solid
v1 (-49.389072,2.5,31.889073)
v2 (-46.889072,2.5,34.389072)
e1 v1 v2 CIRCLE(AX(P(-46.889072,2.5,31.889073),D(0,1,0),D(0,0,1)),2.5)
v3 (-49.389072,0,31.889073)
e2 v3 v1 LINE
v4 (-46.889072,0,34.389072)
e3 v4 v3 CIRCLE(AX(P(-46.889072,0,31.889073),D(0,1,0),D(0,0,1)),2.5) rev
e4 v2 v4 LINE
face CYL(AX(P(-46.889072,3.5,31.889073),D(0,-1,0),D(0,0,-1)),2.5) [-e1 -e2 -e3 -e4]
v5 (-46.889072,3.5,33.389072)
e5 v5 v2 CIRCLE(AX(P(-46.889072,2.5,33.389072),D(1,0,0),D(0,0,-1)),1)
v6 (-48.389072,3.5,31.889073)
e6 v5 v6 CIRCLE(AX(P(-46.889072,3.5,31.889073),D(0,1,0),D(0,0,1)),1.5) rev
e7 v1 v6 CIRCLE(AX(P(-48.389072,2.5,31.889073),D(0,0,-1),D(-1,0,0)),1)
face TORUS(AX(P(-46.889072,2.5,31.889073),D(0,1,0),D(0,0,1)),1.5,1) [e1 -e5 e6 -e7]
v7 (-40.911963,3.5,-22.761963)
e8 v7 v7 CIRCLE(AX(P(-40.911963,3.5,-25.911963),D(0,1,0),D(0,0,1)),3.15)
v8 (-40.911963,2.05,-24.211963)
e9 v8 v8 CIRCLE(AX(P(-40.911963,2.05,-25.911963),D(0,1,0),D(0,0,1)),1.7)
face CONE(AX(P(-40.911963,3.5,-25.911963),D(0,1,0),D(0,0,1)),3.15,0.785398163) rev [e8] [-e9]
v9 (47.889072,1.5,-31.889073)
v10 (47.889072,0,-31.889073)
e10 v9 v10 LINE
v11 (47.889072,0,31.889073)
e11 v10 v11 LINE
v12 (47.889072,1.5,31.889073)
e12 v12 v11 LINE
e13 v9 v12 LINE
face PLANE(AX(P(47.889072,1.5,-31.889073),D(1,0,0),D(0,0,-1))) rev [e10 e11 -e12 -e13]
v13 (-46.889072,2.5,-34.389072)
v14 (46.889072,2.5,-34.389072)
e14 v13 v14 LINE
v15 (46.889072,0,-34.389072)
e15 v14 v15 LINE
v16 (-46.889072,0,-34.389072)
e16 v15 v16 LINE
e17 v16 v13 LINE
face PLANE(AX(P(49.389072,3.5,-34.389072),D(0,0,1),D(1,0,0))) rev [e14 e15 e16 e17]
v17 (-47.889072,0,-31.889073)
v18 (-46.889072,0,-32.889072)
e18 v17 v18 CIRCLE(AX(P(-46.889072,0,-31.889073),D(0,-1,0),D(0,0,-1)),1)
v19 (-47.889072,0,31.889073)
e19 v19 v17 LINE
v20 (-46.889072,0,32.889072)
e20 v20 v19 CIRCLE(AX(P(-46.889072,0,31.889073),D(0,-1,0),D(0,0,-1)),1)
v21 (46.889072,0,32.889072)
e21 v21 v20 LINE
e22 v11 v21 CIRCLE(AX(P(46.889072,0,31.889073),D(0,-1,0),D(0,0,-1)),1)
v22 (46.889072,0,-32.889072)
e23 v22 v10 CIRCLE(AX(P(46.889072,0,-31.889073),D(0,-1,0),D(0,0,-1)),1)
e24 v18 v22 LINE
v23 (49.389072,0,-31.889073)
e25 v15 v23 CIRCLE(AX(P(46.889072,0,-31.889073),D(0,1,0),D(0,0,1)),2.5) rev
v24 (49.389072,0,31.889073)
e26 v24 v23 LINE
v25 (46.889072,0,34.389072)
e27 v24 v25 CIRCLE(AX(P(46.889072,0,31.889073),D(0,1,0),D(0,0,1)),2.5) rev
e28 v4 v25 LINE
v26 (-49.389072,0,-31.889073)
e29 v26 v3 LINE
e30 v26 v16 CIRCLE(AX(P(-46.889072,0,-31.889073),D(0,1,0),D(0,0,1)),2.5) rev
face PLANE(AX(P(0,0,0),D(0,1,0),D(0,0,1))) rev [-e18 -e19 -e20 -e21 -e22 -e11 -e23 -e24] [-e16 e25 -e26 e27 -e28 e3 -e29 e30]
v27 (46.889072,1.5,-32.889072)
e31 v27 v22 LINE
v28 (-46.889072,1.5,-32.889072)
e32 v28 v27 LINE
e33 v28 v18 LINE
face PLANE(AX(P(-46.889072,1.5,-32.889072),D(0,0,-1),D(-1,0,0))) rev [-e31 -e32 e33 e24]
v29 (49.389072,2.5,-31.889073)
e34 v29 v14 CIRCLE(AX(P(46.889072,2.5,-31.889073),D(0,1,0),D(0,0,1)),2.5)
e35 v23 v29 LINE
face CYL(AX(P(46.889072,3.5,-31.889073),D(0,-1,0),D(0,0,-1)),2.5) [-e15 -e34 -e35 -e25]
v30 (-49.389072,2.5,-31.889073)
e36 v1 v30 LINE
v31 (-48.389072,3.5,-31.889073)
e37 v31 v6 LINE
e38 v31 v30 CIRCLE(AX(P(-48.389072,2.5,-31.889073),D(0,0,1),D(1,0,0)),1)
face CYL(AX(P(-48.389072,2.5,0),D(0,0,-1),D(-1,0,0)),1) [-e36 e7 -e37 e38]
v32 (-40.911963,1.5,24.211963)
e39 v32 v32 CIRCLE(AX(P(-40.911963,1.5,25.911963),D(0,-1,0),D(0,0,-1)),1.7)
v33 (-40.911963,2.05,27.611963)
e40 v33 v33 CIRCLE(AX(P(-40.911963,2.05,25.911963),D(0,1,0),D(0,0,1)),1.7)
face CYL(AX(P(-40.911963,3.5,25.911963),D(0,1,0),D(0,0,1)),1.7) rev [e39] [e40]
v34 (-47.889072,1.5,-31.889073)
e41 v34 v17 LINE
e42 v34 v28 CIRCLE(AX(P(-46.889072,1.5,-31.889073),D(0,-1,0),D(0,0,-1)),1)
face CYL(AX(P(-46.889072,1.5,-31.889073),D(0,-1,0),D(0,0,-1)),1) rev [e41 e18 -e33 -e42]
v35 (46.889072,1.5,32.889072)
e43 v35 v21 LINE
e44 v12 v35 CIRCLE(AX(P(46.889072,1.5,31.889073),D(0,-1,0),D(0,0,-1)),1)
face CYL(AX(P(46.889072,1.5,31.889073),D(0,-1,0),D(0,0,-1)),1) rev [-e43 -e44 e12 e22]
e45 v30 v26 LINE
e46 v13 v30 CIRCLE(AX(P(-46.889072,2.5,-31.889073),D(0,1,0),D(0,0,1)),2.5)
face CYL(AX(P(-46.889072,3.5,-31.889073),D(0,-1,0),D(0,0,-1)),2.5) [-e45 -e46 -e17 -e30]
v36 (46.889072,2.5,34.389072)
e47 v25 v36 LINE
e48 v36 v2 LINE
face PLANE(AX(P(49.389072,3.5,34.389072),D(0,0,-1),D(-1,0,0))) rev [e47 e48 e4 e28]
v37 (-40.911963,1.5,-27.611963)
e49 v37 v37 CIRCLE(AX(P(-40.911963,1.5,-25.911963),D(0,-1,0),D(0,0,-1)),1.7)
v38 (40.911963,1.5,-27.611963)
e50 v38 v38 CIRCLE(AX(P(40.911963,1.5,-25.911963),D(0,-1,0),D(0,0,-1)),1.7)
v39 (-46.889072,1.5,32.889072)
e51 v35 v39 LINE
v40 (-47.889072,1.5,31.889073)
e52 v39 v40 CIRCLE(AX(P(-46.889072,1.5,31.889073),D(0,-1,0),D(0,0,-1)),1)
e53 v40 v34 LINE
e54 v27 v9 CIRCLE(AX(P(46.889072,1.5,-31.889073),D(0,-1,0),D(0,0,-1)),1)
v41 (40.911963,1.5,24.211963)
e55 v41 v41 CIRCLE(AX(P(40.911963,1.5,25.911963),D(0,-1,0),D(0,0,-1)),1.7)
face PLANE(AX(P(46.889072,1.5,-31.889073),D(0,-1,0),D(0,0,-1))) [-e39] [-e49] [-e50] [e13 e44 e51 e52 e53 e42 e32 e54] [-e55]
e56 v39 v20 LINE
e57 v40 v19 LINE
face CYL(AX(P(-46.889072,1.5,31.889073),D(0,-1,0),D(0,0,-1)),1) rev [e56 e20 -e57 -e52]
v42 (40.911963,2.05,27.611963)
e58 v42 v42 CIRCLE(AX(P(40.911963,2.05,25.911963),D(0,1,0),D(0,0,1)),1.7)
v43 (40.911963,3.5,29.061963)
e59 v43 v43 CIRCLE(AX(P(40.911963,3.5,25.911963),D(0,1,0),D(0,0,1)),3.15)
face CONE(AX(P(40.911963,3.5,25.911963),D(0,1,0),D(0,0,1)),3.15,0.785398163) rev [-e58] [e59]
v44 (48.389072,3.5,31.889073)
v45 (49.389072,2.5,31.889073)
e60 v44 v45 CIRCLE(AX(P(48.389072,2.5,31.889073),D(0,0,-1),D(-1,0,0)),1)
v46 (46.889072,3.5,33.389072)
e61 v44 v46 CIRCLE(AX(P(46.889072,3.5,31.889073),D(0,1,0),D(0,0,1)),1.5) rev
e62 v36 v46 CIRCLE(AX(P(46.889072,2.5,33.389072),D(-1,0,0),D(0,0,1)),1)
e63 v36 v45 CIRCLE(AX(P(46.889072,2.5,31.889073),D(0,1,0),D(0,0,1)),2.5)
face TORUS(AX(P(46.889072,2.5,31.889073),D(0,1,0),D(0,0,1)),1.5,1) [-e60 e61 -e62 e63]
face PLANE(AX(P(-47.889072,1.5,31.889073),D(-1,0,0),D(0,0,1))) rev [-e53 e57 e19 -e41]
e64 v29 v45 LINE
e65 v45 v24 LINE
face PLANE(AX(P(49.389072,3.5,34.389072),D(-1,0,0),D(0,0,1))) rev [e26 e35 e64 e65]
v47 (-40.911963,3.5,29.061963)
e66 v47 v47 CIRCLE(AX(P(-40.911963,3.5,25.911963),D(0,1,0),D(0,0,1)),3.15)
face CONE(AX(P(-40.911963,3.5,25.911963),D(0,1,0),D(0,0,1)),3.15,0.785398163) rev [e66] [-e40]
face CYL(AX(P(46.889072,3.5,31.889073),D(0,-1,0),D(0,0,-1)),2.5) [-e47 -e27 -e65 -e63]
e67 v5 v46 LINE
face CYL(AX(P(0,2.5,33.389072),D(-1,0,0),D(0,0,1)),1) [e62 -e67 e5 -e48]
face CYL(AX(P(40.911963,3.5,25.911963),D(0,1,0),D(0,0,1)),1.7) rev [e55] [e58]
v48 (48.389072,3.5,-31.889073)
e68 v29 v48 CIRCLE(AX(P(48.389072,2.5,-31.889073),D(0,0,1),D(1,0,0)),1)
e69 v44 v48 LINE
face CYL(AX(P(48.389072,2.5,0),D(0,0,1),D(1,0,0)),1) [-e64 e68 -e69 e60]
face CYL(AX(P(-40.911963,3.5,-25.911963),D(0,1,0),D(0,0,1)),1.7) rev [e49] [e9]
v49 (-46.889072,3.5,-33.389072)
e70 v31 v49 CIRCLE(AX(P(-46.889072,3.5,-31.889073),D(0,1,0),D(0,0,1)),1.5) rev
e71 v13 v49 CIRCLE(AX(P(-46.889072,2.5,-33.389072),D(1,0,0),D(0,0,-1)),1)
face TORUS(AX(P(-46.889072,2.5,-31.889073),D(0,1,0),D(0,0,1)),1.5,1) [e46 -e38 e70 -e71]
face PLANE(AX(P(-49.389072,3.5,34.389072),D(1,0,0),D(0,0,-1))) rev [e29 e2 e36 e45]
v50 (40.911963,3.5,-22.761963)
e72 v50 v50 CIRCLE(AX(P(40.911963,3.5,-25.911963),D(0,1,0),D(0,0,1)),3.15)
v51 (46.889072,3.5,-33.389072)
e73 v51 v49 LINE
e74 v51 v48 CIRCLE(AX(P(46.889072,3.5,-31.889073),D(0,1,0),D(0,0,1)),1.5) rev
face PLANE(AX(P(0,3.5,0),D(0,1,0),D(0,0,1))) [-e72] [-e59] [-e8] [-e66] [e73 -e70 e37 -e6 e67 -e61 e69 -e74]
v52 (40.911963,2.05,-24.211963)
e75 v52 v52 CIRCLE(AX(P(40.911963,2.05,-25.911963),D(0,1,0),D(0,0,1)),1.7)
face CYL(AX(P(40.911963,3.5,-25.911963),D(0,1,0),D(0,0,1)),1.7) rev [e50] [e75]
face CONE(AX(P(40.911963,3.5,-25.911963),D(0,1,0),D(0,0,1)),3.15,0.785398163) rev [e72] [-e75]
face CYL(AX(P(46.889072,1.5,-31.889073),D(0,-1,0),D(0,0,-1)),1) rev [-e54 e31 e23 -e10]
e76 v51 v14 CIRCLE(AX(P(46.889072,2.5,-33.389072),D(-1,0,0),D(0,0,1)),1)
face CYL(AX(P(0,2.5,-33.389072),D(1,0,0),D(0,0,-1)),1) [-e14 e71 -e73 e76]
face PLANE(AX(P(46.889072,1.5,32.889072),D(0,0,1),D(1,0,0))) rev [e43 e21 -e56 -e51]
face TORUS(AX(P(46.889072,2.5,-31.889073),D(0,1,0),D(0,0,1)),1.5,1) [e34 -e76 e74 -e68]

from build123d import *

# Parameters (mm, degrees)
SKETCH2_W                                           = 98.778145
SKETCH2_H                                           = 68.778145
BOSS_EXTRUDE1_DEPTH                                 = 3.5
FILLET1_R                                           = 1
FILLET2_R                                           = 2.5
CUT_EXTRUDE1_DEPTH                                  = 1.5
CSK_FOR_M3_COUNTERSUNK_FLAT_HEAD_SCREW1_D           = 3.4
CSK_FOR_M3_COUNTERSUNK_FLAT_HEAD_SCREW1_DEPTH       = 10
CSK_FOR_M3_COUNTERSUNK_FLAT_HEAD_SCREW1_CSINK_D     = 6.3
CSK_FOR_M3_COUNTERSUNK_FLAT_HEAD_SCREW1_CSINK_ANGLE = 90
CSK_FOR_M3_COUNTERSUNK_FLAT_HEAD_SCREW1_TIP         = 1.021463052


with BuildPart() as part:
    # Sketch2 → Boss-Extrude1 (new body)
    with BuildSketch(Plane(origin=(0, 0, 0), x_dir=(1, 0, 0), z_dir=(0, 1, 0))):
        Rectangle(SKETCH2_W, SKETCH2_H)
    extrude(amount=BOSS_EXTRUDE1_DEPTH)

    # Fillet1
    fillet1_edges = [part.edges().sort_by_distance(p)[0] for p in [
        (49.3890725, 3.5, 0),
        (0, 3.5, -34.3890725),
        (-49.3890725, 3.5, 0),
        (0, 3.5, 34.3890725),
    ]]
    fillet(fillet1_edges, radius=FILLET1_R)

    # Fillet2
    # the kernel refuses this fillet: 2.5 mm, written as the material it takes off along each edge
    with BuildSketch(Plane(origin=(46.8890725, 3.5, 31.8890725), x_dir=(0, 0, 1), z_dir=(-1, 0, 0))) as fillet2_piece_1:
        with BuildLine():
            CenterArc((1.5, -1), 1, 0, 90)
            Line((2.5, -1), (2.5, 0))
            Line((2.5, 0), (1.5, 0))
        make_face()
    revolve(axis=Axis((46.8890725, 3.5, 31.8890725), (0, 1, 0)), revolution_arc=90, mode=Mode.SUBTRACT)
    with BuildSketch(Plane(origin=(-46.8890725, 3.5, 31.8890725), x_dir=(-1, 0, 0), z_dir=(0, 0, -1))) as fillet2_piece_2:
        with BuildLine():
            CenterArc((1.5, -1), 1, 0, 90)
            Line((2.5, -1), (2.5, 0))
            Line((2.5, 0), (1.5, 0))
        make_face()
    revolve(axis=Axis((-46.8890725, 3.5, 31.8890725), (0, 1, 0)), revolution_arc=90, mode=Mode.SUBTRACT)
    with BuildSketch(Plane(origin=(46.8890725, 3.5, -31.8890725), x_dir=(1, 0, 0), z_dir=(0, 0, 1))) as fillet2_piece_3:
        with BuildLine():
            CenterArc((1.5, -1), 1, 0, 90)
            Line((2.5, -1), (2.5, 0))
            Line((2.5, 0), (1.5, 0))
        make_face()
    revolve(axis=Axis((46.8890725, 3.5, -31.8890725), (0, 1, 0)), revolution_arc=90, mode=Mode.SUBTRACT)
    with BuildSketch(Plane(origin=(-46.8890725, 3.5, -31.8890725), x_dir=(0, 0, -1), z_dir=(1, 0, 0))) as fillet2_piece_4:
        with BuildLine():
            CenterArc((1.5, -1), 1, 0, 90)
            Line((2.5, -1), (2.5, 0))
            Line((2.5, 0), (1.5, 0))
        make_face()
    revolve(axis=Axis((-46.8890725, 3.5, -31.8890725), (0, 1, 0)), revolution_arc=90, mode=Mode.SUBTRACT)
    with BuildSketch(Plane(origin=(-49.3890725, -6.25, -34.3890725), x_dir=(0, 0, 1), z_dir=(0, 1, 0)), Plane(origin=(-49.3890725, -6.25, 34.3890725), x_dir=(1, 0, 0), z_dir=(0, 1, 0))) as fillet2_piece_5:
        with BuildLine():
            CenterArc((FILLET2_R, FILLET2_R), FILLET2_R, 180, 90)
            Line((0, FILLET2_R), (0, 0))
            Line((0, 0), (FILLET2_R, 0))
        make_face()
    extrude(amount=9.75, mode=Mode.SUBTRACT)
    with BuildSketch(Plane(origin=(49.3890725, -6.25, -34.3890725), x_dir=(0, 0, 1), z_dir=(0, 1, 0)), Plane(origin=(49.3890725, -6.25, 34.3890725), x_dir=(-1, 0, 0), z_dir=(0, 1, 0))) as fillet2_piece_6:
        with BuildLine():
            CenterArc((FILLET2_R, -FILLET2_R), FILLET2_R, 90, 90)
            Line((0, -FILLET2_R), (0, 0))
            Line((0, 0), (FILLET2_R, 0))
        make_face()
    extrude(amount=9.75, mode=Mode.SUBTRACT)

    # Sketch3 → Cut-Extrude1 (cut)
    with BuildSketch(Plane.XZ):
        with BuildLine():
            Line((47.8890725, -31.8890725), (47.8890725, 31.8890725))
            ThreePointArc((47.8890725, 31.8890725), (47.596179281, 32.596179281), (46.8890725, 32.8890725))
            Line((46.8890725, 32.8890725), (-46.8890725, 32.8890725))
            ThreePointArc((-46.8890725, 32.8890725), (-47.596179281, 32.596179281), (-47.8890725, 31.8890725))
            Line((-47.8890725, 31.8890725), (-47.8890725, -31.8890725))
            ThreePointArc((-47.8890725, -31.8890725), (-47.596179281, -32.596179281), (-46.8890725, -32.8890725))
            Line((-46.8890725, -32.8890725), (46.8890725, -32.8890725))
            ThreePointArc((46.8890725, -32.8890725), (47.596179281, -32.596179281), (47.8890725, -31.8890725))
        make_face()
    extrude(amount=-CUT_EXTRUDE1_DEPTH, mode=Mode.SUBTRACT)

    # CSK for M3 Countersunk Flat Head Screw1
    with Locations(Plane(origin=(-40.911963263, 3.5, -25.911963263), x_dir=(0, 0, 1), z_dir=(0, 1, 0))):
        with Locations((0, 0), (0, 81.823926071), (51.823926071, 81.823926071), (51.823926071, 0)):
            CounterSinkHole(CSK_FOR_M3_COUNTERSUNK_FLAT_HEAD_SCREW1_D / 2, CSK_FOR_M3_COUNTERSUNK_FLAT_HEAD_SCREW1_CSINK_D / 2, depth=CSK_FOR_M3_COUNTERSUNK_FLAT_HEAD_SCREW1_DEPTH, counter_sink_angle=CSK_FOR_M3_COUNTERSUNK_FLAT_HEAD_SCREW1_CSINK_ANGLE)
            with Locations((0, 0, -(CSK_FOR_M3_COUNTERSUNK_FLAT_HEAD_SCREW1_DEPTH + CSK_FOR_M3_COUNTERSUNK_FLAT_HEAD_SCREW1_TIP / 2))):  # 118° drill point
                Cone(0, CSK_FOR_M3_COUNTERSUNK_FLAT_HEAD_SCREW1_D / 2, CSK_FOR_M3_COUNTERSUNK_FLAT_HEAD_SCREW1_TIP, mode=Mode.SUBTRACT)


solid = part.part
